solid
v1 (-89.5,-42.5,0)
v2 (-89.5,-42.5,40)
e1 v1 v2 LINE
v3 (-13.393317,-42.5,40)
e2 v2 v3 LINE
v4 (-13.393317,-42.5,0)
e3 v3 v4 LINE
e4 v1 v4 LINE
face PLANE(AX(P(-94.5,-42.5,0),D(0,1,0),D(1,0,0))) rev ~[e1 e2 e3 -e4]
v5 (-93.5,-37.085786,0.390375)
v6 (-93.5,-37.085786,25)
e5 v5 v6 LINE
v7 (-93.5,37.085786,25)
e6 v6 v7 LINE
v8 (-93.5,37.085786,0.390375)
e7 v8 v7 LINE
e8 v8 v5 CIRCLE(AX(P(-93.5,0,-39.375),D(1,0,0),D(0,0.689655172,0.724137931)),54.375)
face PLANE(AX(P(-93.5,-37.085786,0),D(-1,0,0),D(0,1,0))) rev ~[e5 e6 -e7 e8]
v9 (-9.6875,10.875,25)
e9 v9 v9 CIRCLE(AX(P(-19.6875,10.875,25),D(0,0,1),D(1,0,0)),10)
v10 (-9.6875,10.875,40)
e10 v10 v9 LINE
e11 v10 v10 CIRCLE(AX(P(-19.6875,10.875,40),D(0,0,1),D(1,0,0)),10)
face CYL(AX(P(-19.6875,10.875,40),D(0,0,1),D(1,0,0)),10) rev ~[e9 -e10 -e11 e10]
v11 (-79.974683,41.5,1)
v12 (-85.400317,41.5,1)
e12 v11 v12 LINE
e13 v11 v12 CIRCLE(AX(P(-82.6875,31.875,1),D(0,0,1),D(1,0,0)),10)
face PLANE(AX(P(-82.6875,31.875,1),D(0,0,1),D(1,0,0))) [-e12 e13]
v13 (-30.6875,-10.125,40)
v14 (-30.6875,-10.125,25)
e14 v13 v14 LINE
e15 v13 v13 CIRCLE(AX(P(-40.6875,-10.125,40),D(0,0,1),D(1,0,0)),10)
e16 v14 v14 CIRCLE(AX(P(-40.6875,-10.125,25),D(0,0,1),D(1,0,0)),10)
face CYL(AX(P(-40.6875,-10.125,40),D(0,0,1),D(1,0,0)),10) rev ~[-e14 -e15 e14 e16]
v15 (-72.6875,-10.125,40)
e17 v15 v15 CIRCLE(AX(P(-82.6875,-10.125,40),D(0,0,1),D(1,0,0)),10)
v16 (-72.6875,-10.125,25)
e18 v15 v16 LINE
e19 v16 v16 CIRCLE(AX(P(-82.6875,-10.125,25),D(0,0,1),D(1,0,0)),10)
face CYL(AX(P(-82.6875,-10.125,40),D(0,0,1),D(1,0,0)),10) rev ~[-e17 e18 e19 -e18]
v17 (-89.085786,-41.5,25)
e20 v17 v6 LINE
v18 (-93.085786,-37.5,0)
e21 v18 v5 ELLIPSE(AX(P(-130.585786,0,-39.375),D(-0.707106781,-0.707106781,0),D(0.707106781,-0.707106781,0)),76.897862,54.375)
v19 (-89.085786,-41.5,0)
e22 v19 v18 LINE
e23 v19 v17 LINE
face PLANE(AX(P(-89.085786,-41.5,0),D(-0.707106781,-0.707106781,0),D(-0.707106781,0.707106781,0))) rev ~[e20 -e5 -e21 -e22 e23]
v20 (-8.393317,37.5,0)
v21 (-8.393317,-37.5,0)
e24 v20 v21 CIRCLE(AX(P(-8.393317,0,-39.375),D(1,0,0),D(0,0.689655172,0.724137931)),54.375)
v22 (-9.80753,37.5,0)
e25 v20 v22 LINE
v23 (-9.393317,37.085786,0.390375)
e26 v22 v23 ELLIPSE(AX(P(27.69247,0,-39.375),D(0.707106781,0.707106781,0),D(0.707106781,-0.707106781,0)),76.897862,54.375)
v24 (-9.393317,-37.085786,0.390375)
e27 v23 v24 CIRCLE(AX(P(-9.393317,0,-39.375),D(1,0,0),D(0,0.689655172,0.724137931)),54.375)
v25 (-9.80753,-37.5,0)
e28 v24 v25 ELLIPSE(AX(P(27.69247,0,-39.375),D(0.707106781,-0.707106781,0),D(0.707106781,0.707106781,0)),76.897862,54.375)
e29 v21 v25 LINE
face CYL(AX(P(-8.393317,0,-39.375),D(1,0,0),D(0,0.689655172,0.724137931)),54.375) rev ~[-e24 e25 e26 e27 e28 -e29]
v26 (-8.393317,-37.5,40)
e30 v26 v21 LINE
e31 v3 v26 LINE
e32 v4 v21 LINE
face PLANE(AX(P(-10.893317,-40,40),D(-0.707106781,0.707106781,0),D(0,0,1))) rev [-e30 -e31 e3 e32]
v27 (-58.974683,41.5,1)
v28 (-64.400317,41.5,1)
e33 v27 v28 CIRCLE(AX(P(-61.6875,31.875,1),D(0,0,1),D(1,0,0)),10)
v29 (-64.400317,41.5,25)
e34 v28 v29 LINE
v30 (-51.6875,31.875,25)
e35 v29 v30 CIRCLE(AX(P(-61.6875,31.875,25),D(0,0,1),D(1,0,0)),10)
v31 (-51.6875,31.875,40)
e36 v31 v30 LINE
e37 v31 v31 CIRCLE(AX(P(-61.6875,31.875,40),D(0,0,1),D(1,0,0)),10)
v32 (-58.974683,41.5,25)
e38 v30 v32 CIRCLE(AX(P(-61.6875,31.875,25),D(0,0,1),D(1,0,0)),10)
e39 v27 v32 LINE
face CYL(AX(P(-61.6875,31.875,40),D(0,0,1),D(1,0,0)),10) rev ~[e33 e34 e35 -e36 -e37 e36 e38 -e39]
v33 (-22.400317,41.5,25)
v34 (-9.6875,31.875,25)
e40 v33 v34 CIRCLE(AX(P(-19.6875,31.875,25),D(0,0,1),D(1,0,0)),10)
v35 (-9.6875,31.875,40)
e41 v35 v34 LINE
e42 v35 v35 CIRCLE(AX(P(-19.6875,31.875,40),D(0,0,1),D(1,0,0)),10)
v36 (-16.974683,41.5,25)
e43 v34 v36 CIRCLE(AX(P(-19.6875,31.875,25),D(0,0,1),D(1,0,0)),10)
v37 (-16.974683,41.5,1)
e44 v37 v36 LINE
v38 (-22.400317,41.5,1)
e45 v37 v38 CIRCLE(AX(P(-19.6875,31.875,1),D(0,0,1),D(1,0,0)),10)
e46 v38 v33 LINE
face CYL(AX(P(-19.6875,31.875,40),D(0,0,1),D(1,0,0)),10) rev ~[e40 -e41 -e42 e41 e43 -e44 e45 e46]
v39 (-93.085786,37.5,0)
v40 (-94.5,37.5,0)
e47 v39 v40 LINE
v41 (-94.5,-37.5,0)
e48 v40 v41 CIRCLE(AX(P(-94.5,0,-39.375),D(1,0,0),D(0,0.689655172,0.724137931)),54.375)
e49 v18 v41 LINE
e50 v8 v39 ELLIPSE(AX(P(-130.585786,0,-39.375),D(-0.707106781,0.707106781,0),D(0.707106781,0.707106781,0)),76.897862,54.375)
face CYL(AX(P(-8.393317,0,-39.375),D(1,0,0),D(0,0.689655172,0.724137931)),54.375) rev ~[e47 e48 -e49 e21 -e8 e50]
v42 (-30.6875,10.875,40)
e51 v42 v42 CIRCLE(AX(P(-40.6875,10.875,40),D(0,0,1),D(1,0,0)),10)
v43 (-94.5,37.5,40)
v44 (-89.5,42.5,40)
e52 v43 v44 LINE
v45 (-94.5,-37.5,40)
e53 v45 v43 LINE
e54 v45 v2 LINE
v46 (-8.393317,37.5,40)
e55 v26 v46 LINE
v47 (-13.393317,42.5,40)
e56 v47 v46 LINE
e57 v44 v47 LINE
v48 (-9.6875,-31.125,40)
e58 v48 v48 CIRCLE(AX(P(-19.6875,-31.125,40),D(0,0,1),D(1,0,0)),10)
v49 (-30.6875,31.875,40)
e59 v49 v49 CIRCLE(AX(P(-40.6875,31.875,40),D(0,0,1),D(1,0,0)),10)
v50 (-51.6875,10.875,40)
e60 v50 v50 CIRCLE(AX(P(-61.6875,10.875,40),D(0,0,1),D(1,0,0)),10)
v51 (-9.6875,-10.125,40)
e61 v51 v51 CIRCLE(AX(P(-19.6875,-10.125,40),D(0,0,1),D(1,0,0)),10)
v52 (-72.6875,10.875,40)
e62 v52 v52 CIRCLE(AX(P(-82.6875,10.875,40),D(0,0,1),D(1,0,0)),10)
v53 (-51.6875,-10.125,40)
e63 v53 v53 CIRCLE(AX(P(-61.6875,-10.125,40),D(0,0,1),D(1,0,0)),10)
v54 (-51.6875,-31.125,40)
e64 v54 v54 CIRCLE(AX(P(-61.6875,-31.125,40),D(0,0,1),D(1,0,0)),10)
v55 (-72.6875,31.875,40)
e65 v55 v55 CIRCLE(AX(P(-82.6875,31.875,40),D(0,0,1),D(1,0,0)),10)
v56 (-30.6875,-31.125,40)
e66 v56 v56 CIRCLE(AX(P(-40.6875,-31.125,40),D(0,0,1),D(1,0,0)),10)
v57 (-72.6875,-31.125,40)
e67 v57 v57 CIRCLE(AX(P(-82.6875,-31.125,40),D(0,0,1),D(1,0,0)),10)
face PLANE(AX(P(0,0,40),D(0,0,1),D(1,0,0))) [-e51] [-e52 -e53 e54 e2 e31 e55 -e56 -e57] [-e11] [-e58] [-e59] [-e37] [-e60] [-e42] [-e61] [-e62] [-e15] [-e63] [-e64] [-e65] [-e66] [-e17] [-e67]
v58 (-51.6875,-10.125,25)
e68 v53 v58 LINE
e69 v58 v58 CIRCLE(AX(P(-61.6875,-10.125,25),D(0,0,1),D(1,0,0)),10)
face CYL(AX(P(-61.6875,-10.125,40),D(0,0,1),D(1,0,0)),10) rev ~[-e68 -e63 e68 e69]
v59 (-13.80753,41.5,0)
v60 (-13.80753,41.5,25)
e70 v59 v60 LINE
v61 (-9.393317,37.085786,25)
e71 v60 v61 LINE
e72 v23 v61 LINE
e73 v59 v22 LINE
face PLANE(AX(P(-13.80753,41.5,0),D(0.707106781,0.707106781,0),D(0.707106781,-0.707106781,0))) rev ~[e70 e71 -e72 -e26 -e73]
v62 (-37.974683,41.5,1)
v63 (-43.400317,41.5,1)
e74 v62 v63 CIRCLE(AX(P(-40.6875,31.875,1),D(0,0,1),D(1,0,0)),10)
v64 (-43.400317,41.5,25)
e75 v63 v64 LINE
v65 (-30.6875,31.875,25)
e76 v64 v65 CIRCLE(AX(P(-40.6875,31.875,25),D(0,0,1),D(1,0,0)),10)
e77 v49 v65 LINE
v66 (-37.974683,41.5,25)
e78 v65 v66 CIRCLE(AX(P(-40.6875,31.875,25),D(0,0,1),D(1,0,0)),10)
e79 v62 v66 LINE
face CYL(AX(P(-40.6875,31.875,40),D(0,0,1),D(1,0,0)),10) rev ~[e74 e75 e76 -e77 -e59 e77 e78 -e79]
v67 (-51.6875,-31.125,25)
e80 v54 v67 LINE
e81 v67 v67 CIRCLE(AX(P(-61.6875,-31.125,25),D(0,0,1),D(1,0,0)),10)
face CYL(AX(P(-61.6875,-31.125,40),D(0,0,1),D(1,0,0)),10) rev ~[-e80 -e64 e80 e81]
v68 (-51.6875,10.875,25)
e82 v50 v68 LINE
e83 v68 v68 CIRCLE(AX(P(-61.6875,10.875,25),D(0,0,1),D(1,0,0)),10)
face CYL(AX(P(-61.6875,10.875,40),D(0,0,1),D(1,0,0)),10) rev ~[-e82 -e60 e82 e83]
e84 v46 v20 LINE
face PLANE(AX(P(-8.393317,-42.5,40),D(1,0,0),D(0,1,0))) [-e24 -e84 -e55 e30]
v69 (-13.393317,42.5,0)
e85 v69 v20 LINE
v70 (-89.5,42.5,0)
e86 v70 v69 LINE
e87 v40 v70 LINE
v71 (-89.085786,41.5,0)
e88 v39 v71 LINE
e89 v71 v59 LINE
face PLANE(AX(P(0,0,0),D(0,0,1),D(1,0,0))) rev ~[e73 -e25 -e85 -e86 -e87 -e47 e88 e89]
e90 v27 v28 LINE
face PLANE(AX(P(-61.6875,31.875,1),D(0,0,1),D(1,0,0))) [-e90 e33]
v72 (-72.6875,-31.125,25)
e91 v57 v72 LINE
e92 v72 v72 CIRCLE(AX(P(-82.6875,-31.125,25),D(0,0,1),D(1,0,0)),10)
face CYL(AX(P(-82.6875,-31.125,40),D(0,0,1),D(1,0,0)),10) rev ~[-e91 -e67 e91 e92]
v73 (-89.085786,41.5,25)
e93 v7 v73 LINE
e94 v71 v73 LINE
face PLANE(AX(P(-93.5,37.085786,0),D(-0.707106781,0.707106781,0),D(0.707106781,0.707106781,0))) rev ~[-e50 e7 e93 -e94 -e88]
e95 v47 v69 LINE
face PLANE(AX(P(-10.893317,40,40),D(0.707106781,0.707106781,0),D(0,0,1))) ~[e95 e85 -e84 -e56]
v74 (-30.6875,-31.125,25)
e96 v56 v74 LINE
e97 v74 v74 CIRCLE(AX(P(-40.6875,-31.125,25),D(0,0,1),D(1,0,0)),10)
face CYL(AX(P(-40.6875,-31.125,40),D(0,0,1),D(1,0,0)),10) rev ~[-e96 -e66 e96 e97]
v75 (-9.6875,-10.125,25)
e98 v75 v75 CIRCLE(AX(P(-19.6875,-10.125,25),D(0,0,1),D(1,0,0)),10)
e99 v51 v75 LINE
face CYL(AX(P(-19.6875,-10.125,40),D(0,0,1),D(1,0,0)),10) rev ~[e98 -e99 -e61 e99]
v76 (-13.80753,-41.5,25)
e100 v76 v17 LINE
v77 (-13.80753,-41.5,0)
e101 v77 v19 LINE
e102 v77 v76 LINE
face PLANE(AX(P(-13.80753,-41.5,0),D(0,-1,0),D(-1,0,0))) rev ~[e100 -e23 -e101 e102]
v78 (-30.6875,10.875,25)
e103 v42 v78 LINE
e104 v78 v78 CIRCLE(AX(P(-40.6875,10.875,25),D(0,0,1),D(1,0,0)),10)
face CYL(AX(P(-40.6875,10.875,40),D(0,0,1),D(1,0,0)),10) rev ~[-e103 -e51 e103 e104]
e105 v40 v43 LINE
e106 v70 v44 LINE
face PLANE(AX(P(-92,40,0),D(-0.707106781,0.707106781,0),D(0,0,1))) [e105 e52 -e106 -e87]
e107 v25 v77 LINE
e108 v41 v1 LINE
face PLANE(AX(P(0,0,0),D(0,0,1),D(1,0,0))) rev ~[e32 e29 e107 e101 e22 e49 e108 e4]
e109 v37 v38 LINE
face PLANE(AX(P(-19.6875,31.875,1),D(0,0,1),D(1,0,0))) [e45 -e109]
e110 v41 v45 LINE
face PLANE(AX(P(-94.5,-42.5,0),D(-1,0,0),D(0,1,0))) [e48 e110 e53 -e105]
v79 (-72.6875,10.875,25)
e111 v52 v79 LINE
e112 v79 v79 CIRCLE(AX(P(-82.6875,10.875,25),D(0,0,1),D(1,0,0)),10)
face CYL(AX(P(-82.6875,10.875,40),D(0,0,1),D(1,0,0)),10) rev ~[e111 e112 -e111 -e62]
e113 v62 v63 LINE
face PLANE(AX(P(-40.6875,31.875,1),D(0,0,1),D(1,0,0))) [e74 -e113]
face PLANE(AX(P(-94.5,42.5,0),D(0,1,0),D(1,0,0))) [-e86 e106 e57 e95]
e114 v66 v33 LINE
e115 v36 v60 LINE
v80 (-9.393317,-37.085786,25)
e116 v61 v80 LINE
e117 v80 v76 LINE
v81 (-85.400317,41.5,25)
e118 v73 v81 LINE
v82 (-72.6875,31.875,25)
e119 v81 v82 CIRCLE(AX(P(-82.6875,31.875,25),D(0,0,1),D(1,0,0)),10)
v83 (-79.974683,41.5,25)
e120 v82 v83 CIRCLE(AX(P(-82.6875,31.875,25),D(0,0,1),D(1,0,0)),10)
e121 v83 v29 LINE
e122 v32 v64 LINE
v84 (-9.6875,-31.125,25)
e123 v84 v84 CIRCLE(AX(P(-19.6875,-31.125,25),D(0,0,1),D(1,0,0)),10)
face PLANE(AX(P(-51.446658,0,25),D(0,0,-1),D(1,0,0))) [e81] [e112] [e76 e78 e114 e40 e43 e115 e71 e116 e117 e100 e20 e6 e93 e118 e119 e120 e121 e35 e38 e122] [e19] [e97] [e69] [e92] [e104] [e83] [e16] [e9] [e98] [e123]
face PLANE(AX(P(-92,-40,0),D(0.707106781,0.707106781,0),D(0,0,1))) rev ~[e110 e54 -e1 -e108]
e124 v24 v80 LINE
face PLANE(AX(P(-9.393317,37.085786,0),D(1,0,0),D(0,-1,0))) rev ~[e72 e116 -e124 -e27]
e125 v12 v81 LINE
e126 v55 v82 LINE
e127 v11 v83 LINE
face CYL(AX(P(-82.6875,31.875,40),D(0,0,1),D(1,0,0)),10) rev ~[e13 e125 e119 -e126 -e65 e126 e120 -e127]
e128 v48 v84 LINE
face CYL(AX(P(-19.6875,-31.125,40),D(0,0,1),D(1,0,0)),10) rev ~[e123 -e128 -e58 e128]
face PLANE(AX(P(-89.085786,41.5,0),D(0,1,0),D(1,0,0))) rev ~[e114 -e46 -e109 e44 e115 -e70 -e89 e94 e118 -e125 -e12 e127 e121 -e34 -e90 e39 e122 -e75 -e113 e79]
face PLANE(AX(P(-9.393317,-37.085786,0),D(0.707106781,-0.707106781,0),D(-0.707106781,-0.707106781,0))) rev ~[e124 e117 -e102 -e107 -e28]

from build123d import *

# Parameters (mm, degrees)
F0_W      = 189
F0_H      = 85
F1_DEPTH  = 40
F2_R      = 10
F3_DEPTH  = 39
F4_W      = 102.8933165297
F4_H      = 85
F5_DEPTH  = 40.001
F6_SIZE   = 5
F8_DEPTH  = 25
F10_DEPTH = 86.1076834703


# Not quite as in the source:
# - a feature names something its author has since deleted; it is built from what else it names


with BuildPart() as f1:
    # F0 (on Top) → F1 (new body)
    with BuildSketch(Plane.XY):
        Rectangle(F0_W, F0_H)
    extrude(amount=F1_DEPTH)

    # F2 (on face) → F3 (cut)
    with BuildSketch(Plane.XY.offset(40)):
        with Locations((-82.6875, 31.875)):
            Circle(F2_R)
        with Locations((-61.6875, 31.875)):
            Circle(F2_R)
        with Locations((-40.6875, 31.875)):
            Circle(F2_R)
        with Locations((-19.6875, 31.875)):
            Circle(F2_R)
        with Locations((-19.6875, 10.875)):
            Circle(F2_R)
        with Locations((-40.6875, 10.875)):
            Circle(F2_R)
        with Locations((-61.6875, 10.875)):
            Circle(F2_R)
        with Locations((-82.6875, 10.875)):
            Circle(F2_R)
        with Locations((-82.6875, -10.125)):
            Circle(F2_R)
        with Locations((-61.6875, -10.125)):
            Circle(F2_R)
        with Locations((-40.6875, -10.125)):
            Circle(F2_R)
        with Locations((-19.6875, -10.125)):
            Circle(F2_R)
        with Locations((-19.6875, -31.125)):
            Circle(F2_R)
        with Locations((-40.6875, -31.125)):
            Circle(F2_R)
        with Locations((-61.6875, -31.125)):
            Circle(F2_R)
        with Locations((-82.6875, -31.125)):
            Circle(F2_R)
    extrude(amount=-F3_DEPTH, mode=Mode.SUBTRACT)

    # F4 (on face) → F5 (cut, through all)
    with BuildSketch(Plane.XY.offset(40)):
        with Locations((43.0533417352, 0)):
            Rectangle(F4_W, F4_H)
    extrude(amount=-F5_DEPTH, mode=Mode.SUBTRACT)

    # F6
    f6_edges = [f1.edges().sort_by_distance(p)[0] for p in [
        (-94.5, 42.5, 20),
        (-8.393317, 42.5, 20),
        (-8.393317, -42.5, 20),
        (-94.5, -42.5, 20),
    ]]
    chamfer(f6_edges, length=F6_SIZE)

    # F7 (on face) → F8 (cut)
    with BuildSketch(Plane(origin=(0, 0, 0), x_dir=(1, 0, 0), z_dir=(0, 0, -1))):
        Polygon((-9.3933165297, -37.0857864376), (-9.3933165297, 37.0857864376), (-13.8075300921, 41.5), (-89.0857864376, 41.5), (-93.5, 37.0857864376), (-93.5, -37.0857864376), (-89.0857864376, -41.5), (-13.8075300921, -41.5), align=None)
    extrude(amount=-F8_DEPTH, mode=Mode.SUBTRACT)

    # F9 (on face) → F10 (cut, through all)
    with BuildSketch(Plane.YZ.offset(-8.3933165297)):
        with BuildLine():
            Line((-37.5, 0), (37.5, 0))
            ThreePointArc((37.5, 0), (0, 15), (-37.5, 0))
        make_face()
    extrude(amount=-F10_DEPTH, mode=Mode.SUBTRACT)


solid = f1.part
